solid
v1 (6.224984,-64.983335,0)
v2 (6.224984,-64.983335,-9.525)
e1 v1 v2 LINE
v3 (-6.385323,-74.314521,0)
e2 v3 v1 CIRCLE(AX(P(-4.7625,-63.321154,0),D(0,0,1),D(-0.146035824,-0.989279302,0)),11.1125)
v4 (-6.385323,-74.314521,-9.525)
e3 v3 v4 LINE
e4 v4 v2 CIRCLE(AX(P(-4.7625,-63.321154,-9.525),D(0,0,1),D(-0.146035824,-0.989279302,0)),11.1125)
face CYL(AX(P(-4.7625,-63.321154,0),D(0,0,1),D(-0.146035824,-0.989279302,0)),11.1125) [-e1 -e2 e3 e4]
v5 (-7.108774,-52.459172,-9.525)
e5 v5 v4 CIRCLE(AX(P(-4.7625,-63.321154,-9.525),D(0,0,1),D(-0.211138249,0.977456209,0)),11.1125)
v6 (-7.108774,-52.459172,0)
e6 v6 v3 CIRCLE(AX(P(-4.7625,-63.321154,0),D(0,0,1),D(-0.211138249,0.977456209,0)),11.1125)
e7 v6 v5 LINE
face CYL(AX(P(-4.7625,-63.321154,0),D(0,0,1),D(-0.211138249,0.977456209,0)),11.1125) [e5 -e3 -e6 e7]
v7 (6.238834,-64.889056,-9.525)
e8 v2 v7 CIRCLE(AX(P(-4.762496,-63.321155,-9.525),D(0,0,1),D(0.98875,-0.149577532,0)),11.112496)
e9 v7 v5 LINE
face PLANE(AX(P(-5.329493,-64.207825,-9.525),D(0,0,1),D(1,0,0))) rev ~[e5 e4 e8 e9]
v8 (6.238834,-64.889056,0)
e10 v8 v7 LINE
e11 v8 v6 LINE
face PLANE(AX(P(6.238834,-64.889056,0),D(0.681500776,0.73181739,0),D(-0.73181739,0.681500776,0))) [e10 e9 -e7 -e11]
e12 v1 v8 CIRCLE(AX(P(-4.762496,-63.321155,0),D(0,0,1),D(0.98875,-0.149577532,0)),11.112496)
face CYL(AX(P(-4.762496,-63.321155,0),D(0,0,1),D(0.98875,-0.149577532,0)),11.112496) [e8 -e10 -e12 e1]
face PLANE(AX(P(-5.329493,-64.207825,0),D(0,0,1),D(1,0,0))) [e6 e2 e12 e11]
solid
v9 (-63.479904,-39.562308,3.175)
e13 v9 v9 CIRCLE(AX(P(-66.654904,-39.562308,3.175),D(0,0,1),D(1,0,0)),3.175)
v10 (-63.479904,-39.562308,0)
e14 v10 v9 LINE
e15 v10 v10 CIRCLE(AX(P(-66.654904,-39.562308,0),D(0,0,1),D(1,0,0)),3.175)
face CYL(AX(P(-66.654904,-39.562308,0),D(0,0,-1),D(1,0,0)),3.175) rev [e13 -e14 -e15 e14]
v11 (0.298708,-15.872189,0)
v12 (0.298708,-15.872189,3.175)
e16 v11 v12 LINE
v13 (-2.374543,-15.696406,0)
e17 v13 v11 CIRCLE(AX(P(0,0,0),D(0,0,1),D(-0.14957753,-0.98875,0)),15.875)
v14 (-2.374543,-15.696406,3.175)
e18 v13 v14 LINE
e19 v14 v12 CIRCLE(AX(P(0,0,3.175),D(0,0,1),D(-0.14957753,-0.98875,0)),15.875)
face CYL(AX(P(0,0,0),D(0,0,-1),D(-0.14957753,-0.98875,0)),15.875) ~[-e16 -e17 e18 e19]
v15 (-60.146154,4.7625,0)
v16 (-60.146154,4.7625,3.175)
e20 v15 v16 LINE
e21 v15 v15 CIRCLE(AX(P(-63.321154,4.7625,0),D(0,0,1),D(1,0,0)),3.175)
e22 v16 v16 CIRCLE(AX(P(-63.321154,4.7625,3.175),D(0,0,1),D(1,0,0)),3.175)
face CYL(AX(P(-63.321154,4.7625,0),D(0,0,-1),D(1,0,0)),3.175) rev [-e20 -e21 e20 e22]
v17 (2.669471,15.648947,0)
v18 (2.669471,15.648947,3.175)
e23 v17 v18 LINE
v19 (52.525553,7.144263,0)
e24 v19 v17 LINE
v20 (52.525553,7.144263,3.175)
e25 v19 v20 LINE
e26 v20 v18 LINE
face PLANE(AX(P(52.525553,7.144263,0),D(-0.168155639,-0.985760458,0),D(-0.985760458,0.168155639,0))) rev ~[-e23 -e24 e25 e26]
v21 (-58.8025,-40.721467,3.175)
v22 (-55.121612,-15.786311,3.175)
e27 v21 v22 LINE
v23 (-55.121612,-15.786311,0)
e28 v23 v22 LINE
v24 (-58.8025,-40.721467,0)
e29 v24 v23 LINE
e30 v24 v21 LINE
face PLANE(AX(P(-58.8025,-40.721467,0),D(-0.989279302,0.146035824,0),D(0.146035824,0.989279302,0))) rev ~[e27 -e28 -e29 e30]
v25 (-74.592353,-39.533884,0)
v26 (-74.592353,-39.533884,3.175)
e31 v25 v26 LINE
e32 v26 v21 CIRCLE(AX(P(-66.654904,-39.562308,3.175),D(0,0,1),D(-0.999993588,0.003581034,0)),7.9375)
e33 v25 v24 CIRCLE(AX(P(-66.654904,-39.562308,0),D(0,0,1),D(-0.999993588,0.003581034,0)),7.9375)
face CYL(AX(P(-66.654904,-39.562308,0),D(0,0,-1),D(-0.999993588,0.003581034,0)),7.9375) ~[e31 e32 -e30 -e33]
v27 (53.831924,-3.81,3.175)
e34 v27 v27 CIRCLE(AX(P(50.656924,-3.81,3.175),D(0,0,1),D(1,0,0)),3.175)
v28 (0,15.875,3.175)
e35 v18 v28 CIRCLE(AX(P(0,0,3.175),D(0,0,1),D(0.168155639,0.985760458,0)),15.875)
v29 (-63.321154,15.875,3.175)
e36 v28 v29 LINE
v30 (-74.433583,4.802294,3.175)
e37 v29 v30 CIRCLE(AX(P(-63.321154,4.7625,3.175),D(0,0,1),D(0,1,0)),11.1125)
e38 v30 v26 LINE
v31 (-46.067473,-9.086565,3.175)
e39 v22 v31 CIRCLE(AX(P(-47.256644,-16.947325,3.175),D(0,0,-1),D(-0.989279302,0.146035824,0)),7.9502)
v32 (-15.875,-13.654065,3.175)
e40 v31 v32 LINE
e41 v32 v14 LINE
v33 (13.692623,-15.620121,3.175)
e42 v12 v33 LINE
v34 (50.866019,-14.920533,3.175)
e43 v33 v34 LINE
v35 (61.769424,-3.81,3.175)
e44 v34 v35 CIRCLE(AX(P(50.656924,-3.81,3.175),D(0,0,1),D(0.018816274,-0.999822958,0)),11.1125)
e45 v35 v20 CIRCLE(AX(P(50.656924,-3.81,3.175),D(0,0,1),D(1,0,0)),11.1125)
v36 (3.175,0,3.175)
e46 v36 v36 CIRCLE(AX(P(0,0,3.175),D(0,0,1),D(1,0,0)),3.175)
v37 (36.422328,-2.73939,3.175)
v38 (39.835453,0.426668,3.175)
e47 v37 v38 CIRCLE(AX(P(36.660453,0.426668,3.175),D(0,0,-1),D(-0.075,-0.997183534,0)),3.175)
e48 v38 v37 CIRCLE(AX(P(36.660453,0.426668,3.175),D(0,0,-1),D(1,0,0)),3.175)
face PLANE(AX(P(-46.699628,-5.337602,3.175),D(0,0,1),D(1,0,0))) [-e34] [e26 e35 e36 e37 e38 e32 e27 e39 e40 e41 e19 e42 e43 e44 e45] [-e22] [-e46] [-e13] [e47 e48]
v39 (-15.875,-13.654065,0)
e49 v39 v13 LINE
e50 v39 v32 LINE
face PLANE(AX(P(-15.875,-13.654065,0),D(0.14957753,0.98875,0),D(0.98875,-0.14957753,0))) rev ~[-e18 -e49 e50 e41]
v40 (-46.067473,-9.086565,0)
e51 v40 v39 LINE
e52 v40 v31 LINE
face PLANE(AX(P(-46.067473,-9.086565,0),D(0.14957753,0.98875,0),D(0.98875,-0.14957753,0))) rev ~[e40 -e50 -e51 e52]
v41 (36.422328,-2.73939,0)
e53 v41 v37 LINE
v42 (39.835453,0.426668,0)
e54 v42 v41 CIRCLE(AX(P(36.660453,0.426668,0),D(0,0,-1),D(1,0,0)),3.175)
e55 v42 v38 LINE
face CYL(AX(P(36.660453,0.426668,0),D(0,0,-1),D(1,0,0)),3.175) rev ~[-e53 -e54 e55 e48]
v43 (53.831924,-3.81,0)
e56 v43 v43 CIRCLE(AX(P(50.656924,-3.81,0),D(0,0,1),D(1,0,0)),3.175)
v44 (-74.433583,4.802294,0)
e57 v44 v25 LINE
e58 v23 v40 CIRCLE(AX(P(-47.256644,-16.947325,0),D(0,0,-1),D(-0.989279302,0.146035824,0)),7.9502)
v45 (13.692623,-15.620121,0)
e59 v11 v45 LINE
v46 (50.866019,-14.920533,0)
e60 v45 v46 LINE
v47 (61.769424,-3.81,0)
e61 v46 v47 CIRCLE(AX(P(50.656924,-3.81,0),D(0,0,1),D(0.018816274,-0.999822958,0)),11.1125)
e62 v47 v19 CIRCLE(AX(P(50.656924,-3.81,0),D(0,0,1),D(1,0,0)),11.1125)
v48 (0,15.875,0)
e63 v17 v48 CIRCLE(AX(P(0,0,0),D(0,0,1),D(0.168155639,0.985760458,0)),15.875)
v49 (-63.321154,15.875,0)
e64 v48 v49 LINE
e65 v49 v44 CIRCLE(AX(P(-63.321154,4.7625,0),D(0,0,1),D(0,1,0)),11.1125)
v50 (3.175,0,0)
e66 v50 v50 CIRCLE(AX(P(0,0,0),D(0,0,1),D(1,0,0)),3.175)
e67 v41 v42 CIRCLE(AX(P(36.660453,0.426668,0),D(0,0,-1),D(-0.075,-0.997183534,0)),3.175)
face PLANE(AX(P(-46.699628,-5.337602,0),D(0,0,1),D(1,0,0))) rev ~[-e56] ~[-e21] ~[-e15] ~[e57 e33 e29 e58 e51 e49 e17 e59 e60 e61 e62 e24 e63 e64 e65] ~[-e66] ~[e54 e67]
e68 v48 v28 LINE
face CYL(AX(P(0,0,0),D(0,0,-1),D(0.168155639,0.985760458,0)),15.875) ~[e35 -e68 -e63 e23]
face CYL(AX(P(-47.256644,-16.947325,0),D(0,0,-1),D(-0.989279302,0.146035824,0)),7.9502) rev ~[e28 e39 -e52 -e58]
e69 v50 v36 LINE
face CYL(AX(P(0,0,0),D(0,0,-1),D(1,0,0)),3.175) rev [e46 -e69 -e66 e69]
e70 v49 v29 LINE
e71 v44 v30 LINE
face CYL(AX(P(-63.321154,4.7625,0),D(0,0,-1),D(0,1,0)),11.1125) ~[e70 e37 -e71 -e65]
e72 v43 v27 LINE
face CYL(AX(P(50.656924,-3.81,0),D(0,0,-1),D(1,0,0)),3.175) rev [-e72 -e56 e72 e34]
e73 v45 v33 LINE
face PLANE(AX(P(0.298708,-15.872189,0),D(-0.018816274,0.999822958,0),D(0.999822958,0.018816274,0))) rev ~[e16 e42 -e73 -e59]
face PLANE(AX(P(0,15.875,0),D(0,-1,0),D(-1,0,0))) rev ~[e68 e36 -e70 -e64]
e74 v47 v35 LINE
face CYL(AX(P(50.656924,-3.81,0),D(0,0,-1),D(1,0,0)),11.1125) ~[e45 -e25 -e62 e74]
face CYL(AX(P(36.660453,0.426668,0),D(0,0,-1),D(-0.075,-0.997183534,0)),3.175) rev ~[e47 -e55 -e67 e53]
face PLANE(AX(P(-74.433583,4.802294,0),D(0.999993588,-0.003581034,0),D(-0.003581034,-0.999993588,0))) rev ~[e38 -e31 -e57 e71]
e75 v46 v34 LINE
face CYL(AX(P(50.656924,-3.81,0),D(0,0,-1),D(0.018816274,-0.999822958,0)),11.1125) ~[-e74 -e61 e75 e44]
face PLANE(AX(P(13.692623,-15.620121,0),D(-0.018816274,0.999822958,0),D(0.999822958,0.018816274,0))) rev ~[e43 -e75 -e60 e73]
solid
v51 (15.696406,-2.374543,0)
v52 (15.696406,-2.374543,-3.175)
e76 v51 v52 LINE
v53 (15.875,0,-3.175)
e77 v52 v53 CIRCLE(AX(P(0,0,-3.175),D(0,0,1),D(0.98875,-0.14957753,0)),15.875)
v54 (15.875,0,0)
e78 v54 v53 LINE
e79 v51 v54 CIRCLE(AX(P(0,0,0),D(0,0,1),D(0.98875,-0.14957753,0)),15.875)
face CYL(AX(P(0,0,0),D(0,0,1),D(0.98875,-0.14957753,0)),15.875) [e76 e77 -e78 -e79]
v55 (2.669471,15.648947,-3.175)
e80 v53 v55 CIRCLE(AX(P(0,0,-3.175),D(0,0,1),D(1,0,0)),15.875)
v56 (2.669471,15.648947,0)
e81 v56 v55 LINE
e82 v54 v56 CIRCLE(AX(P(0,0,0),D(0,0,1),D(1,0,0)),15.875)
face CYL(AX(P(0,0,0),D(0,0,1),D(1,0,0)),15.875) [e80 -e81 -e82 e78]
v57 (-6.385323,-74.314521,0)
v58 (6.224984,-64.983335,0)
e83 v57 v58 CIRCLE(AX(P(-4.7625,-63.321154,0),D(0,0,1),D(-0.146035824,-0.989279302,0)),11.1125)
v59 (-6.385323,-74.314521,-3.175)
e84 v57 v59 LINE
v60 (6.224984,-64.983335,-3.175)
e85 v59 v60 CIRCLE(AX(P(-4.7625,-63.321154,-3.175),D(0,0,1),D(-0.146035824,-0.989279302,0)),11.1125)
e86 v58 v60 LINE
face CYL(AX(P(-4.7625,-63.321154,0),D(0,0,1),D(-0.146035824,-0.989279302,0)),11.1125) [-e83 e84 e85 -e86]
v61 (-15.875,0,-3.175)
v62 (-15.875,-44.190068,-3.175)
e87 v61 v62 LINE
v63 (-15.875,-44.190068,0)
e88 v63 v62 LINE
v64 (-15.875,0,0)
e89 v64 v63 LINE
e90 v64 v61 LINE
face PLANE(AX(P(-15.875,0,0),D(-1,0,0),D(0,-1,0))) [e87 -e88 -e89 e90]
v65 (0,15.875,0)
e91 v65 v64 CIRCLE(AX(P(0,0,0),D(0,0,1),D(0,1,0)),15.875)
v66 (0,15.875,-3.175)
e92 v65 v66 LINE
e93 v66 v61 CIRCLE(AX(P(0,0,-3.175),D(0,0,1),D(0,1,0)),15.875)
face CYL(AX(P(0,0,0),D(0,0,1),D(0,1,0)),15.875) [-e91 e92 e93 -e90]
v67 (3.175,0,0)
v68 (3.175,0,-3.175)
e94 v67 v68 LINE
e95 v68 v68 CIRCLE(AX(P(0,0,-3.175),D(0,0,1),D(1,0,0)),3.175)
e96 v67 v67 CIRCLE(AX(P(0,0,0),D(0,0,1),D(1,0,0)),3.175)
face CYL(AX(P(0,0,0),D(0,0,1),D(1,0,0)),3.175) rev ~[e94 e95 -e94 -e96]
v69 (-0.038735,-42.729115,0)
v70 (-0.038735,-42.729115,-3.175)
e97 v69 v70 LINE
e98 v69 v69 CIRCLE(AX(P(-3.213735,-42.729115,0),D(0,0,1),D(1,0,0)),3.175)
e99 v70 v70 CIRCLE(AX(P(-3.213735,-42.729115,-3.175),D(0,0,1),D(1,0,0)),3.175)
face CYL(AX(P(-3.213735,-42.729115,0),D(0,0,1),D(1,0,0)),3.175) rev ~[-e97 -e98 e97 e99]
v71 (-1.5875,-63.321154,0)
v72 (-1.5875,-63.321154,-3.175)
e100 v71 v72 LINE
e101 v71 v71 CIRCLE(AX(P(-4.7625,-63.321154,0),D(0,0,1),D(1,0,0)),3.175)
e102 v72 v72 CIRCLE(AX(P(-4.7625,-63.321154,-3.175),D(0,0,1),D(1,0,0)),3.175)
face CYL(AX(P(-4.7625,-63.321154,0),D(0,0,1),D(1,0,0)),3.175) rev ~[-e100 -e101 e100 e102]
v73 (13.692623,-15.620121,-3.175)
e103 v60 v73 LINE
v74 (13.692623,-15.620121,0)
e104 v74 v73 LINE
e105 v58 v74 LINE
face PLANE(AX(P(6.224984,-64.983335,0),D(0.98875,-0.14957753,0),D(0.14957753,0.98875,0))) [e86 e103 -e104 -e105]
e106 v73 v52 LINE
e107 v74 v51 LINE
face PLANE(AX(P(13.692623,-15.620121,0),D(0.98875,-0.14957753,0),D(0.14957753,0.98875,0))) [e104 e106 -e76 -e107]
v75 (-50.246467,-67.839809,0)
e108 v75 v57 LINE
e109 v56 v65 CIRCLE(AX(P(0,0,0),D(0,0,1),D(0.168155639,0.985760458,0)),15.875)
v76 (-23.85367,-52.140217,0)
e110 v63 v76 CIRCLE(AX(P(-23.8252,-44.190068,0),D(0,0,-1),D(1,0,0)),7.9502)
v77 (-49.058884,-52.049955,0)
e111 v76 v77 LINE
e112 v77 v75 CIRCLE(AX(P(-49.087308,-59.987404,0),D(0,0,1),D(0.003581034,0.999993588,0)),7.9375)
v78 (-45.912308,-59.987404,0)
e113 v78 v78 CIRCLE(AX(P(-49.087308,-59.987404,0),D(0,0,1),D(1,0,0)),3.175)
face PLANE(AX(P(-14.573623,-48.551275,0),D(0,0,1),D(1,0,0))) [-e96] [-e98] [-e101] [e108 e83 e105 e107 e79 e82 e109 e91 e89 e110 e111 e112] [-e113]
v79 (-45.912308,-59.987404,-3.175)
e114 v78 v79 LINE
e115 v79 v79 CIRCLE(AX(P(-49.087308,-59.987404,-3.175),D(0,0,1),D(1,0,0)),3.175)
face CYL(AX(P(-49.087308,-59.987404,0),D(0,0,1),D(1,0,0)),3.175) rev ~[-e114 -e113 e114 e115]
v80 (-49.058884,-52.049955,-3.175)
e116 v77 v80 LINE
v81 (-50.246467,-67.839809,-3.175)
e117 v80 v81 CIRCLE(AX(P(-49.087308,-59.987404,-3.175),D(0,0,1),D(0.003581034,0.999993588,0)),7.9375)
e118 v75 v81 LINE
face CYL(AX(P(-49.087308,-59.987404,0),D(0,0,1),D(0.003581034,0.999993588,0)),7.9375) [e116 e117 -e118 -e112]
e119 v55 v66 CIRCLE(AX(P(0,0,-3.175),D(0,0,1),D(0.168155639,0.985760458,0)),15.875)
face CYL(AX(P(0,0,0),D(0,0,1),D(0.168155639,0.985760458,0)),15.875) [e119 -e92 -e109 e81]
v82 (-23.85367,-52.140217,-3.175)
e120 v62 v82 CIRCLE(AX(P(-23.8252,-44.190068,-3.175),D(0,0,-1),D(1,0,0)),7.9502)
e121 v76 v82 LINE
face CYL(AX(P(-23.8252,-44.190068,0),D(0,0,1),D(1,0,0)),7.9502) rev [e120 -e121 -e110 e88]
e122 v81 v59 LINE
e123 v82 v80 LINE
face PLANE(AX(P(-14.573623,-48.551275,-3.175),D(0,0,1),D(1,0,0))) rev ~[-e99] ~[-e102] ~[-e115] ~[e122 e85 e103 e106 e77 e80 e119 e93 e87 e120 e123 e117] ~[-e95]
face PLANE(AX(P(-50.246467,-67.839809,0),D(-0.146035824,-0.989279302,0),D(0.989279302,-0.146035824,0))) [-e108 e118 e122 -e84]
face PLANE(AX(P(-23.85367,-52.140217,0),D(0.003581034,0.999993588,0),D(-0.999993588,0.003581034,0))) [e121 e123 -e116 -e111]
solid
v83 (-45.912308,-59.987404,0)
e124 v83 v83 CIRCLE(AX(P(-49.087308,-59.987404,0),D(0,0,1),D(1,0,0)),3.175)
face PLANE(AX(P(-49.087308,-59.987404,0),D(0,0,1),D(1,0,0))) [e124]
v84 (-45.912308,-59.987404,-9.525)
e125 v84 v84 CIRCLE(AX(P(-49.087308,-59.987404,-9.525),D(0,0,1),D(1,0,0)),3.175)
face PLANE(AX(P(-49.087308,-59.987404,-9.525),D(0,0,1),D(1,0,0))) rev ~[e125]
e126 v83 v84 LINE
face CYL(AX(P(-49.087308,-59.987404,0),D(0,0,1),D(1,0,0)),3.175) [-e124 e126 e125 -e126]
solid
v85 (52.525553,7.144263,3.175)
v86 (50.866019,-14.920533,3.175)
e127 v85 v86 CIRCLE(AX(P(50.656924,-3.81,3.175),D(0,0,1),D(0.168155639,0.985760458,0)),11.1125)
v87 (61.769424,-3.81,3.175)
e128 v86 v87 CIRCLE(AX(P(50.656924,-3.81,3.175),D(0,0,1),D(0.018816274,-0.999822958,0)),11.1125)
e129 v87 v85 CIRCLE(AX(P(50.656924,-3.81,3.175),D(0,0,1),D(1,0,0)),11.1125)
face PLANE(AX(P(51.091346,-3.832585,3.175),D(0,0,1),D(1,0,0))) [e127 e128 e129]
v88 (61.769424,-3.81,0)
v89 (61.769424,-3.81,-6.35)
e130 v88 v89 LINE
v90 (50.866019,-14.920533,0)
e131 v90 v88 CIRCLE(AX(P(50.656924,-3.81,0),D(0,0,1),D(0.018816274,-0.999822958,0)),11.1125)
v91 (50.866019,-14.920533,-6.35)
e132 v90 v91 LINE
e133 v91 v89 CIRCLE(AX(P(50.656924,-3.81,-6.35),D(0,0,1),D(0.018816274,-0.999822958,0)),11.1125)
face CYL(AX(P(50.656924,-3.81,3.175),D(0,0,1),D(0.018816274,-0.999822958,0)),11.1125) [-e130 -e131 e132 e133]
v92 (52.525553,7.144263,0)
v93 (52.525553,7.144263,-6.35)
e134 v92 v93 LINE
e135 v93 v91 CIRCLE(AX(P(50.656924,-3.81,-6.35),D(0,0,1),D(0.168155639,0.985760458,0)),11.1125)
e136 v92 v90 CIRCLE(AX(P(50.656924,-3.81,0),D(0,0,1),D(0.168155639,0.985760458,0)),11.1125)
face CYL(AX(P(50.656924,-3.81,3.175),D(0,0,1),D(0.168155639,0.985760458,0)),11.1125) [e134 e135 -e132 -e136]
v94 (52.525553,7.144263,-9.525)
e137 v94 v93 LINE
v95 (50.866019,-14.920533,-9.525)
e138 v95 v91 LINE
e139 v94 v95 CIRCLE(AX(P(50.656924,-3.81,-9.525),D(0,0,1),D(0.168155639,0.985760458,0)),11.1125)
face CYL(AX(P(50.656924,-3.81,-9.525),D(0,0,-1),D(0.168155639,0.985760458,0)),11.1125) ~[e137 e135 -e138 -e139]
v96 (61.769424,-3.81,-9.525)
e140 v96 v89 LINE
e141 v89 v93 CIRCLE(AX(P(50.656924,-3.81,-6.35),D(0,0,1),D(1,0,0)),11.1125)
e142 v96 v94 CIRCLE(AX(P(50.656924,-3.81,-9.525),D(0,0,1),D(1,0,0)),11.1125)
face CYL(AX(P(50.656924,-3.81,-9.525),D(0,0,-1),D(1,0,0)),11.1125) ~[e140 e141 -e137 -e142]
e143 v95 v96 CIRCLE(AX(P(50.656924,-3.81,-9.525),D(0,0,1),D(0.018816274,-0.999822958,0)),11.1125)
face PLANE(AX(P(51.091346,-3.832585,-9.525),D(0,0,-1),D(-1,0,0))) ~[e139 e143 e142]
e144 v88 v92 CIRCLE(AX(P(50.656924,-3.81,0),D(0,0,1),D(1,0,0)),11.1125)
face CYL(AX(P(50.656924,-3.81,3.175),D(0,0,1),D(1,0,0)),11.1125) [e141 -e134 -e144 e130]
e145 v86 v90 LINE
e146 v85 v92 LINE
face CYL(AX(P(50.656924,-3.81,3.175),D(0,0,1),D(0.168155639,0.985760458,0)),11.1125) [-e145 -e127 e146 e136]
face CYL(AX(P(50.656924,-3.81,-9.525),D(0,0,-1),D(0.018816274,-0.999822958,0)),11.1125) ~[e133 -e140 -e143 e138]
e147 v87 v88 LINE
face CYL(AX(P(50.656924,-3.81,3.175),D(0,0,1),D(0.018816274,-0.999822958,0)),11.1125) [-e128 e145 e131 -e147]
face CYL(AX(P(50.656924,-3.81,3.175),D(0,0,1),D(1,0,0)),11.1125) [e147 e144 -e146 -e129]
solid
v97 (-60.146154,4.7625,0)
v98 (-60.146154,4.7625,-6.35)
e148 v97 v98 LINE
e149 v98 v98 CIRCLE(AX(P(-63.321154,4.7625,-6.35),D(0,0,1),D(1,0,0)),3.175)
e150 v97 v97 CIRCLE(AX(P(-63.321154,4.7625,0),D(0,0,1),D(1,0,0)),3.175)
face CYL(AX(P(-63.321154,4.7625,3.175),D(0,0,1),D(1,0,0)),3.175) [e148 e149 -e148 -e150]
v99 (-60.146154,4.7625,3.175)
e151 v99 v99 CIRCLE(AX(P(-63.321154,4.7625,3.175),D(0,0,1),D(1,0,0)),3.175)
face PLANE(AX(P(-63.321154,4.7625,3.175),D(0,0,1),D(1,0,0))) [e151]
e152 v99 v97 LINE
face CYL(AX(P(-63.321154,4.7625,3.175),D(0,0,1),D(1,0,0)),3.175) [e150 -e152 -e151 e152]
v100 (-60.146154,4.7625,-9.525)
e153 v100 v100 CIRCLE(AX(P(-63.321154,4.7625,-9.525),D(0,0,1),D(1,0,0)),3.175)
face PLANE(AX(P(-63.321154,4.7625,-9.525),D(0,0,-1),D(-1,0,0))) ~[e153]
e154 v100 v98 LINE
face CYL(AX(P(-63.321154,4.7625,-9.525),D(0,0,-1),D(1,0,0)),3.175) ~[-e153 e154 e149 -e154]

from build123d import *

# Parameters (mm, degrees)
F0_R     = 3.175
F1_DEPTH = 3.175
F2_DEPTH = 3.175
F4_R     = 3.175
F6_DEPTH = 9.525
F3_R     = 3.175


# Not quite as in the source:
# - a pattern or mirror of a feature is missing from the dataset's text; its kind, count and spacing are read off the source's solid


with BuildPart() as f1:
    # F0 (on Top) → F1 (new body)
    with BuildSketch(Plane.XY):
        with BuildLine():
            ThreePointArc((-15.875, 0), (-11.2253201513, 11.2253201513), (0, 15.875))
            Line((0, 15.875), (-63.3211543937, 15.875))
            ThreePointArc((-63.3211543937, 15.875), (-55.4634302878, 12.6202241059), (-52.2086543937, 4.7625))
            ThreePointArc((-52.2086543937, 4.7625), (-63.3410515432, -6.3499821869), (-74.4335831412, 4.8022942352))
            Line((-74.4335831412, 4.8022942352), (-74.5923534991, -39.5338836219))
            ThreePointArc((-74.5923534991, -39.5338836219), (-66.6406921441, -31.6248207993), (-58.7174043937, -39.5623080756))
            ThreePointArc((-58.7174043937, -39.5623080756), (-58.7387068636, -40.1434474), (-58.8024999312, -40.7214674292))
            Line((-58.8024999312, -40.7214674292), (-55.1216121776, -15.7863113327))
            ThreePointArc((-55.1216121776, -15.7863113327), (-51.9856201231, -10.5565144679), (-46.0674725884, -9.0865650912))
            Line((-46.0674725884, -9.0865650912), (-15.875, -13.6540649408))
            Line((-15.875, -13.6540649408), (-15.875, 0))
        make_face()
        with BuildLine():
            ThreePointArc((-52.2086543937, 4.7625), (-55.4634302878, 12.6202241059), (-63.3211543937, 15.875))
            ThreePointArc((-63.3211543937, 15.875), (-71.1647964945, 12.6342809195), (-74.4335831412, 4.8022942352))
            ThreePointArc((-74.4335831412, 4.8022942352), (-63.3410515432, -6.3499821869), (-52.2086543937, 4.7625))
        make_face()
        with Locations((-63.3211543937, 4.7625)):
            Circle(F0_R, mode=Mode.SUBTRACT)
        with BuildLine():
            ThreePointArc((15.69640625, -2.3745432898), (15.8302885984, -1.190625), (15.875, 0))
            ThreePointArc((15.875, 0), (12.1324662265, 10.238109604), (2.6694707699, 15.6489472748))
            ThreePointArc((2.6694707699, 15.6489472748), (1.3395124137, 15.8183858688), (0, 15.875))
            ThreePointArc((0, 15.875), (-11.2253201513, 11.2253201513), (-15.875, 0))
            ThreePointArc((-15.875, 0), (-12.0356034274, -10.3518054047), (-2.3745432898, -15.69640625))
            ThreePointArc((-2.3745432898, -15.69640625), (-1.0416321888, -15.8407899861), (0.2987083423, -15.8721894623))
            ThreePointArc((0.2987083423, -15.8721894623), (10.4645848343, -11.9376752027), (15.69640625, -2.3745432898))
        make_face()
        Circle(F0_R, mode=Mode.SUBTRACT)
        with BuildLine():
            ThreePointArc((61.769423515, -3.81), (59.1496498735, 3.3566767228), (52.5255530539, 7.1442630923))
            ThreePointArc((52.5255530539, 7.1442630923), (39.5757214961, -2.9765625), (50.8660193546, -14.9205326236))
            ThreePointArc((50.8660193546, -14.9205326236), (58.5882296422, -11.5934464966), (61.769423515, -3.81))
        make_face()
        with Locations((50.656923515, -3.81)):
            Circle(F0_R, mode=Mode.SUBTRACT)
        with BuildLine():
            ThreePointArc((2.6694707699, 15.6489472748), (12.1324662265, 10.238109604), (15.875, 0))
            ThreePointArc((15.875, 0), (15.8302885984, -1.190625), (15.69640625, -2.3745432898))
            Line((15.69640625, -2.3745432898), (13.6926228472, -15.6201212767))
            Line((13.6926228472, -15.6201212767), (50.8660193546, -14.9205326236))
            ThreePointArc((50.8660193546, -14.9205326236), (39.5757214961, -2.9765625), (52.5255530539, 7.1442630923))
            Line((52.5255530539, 7.1442630923), (2.6694707699, 15.6489472748))
        make_face()
        with BuildLine():
            ThreePointArc((36.4223280073, -2.73939), (34.501219564, 2.7543996496), (39.8354530073, 0.4266677197))
            ThreePointArc((39.8354530073, 0.4266677197), (38.8196864505, -1.9010642102), (36.4223280073, -2.73939))
        make_face(mode=Mode.SUBTRACT)
        with BuildLine():
            Line((13.6926228472, -15.6201212767), (15.69640625, -2.3745432898))
            ThreePointArc((15.69640625, -2.3745432898), (10.4645848343, -11.9376752027), (0.2987083423, -15.8721894623))
            Line((0.2987083423, -15.8721894623), (13.6926228472, -15.6201212767))
        make_face()
        with BuildLine():
            ThreePointArc((-2.3745432898, -15.69640625), (-12.0356034274, -10.3518054047), (-15.875, 0))
            Line((-15.875, 0), (-15.875, -13.6540649408))
            Line((-15.875, -13.6540649408), (-2.3745432898, -15.69640625))
        make_face()
        with BuildLine():
            ThreePointArc((-58.7174043937, -39.5623080756), (-66.6406921441, -31.6248207993), (-74.5923534991, -39.5338836219))
            ThreePointArc((-74.5923534991, -39.5338836219), (-67.2502168937, -47.4774523748), (-58.8024999312, -40.7214674292))
            ThreePointArc((-58.8024999312, -40.7214674292), (-58.7387068636, -40.1434474), (-58.7174043937, -39.5623080756))
        make_face()
        with Locations((-66.6549043937, -39.5623080756)):
            Circle(F0_R, mode=Mode.SUBTRACT)
    extrude(amount=F1_DEPTH)


with BuildPart() as f2:
    # F0 (on Top) → F2 (new body)
    with BuildSketch(Plane.XY):
        with BuildLine():
            Line((13.6926228472, -15.6201212767), (0.2987083423, -15.8721894623))
            ThreePointArc((0.2987083423, -15.8721894623), (-1.0416321888, -15.8407899861), (-2.3745432898, -15.69640625))
            Line((-2.3745432898, -15.69640625), (-15.875, -13.6540649408))
            Line((-15.875, -13.6540649408), (-15.875, -44.1900675587))
            ThreePointArc((-15.875, -44.1900675587), (-18.213634337, -49.8217645365), (-23.8536699328, -52.1402165826))
            Line((-23.8536699328, -52.1402165826), (-49.0588836219, -52.0499552883))
            ThreePointArc((-49.0588836219, -52.0499552883), (-43.4646074188, -54.3848028931), (-41.1498080756, -59.9874043937))
            ThreePointArc((-41.1498080756, -59.9874043937), (-43.9006386779, -65.9959289055), (-50.2464674292, -67.8398088562))
            Line((-50.2464674292, -67.8398088562), (-6.385323095, -74.3145206412))
            ThreePointArc((-6.385323095, -74.3145206412), (-12.0238371567, -54.9092200771), (6.35, -63.3211543937))
            ThreePointArc((6.35, -63.3211543937), (6.3187020189, -64.1545918937), (6.224984375, -64.9833346965))
            Line((6.224984375, -64.9833346965), (13.6926228472, -15.6201212767))
        make_face()
        with Locations((-3.213735, -42.7291149849)):
            Circle(F0_R, mode=Mode.SUBTRACT)
        with BuildLine():
            ThreePointArc((-49.0588836219, -52.0499552883), (-57.0024523748, -59.3920918937), (-50.2464674292, -67.8398088562))
            ThreePointArc((-50.2464674292, -67.8398088562), (-43.9006386779, -65.9959289055), (-41.1498080756, -59.9874043937))
            ThreePointArc((-41.1498080756, -59.9874043937), (-43.4646074188, -54.3848028931), (-49.0588836219, -52.0499552883))
        make_face()
        with Locations((-49.0873080756, -59.9874043937)):
            Circle(F0_R, mode=Mode.SUBTRACT)
        with BuildLine():
            ThreePointArc((-6.385323095, -74.3145206412), (1.847490772, -72.253997068), (6.224984375, -64.9833346965))
            ThreePointArc((6.224984375, -64.9833346965), (6.3187020189, -64.1545918937), (6.35, -63.3211543937))
            ThreePointArc((6.35, -63.3211543937), (-12.0238371567, -54.9092200771), (-6.385323095, -74.3145206412))
        make_face()
        with Locations((-4.7625, -63.3211543937)):
            Circle(F0_R, mode=Mode.SUBTRACT)
        with BuildLine():
            ThreePointArc((15.69640625, -2.3745432898), (15.8302885984, -1.190625), (15.875, 0))
            ThreePointArc((15.875, 0), (12.1324662265, 10.238109604), (2.6694707699, 15.6489472748))
            ThreePointArc((2.6694707699, 15.6489472748), (1.3395124137, 15.8183858688), (0, 15.875))
            ThreePointArc((0, 15.875), (-11.2253201513, 11.2253201513), (-15.875, 0))
            ThreePointArc((-15.875, 0), (-12.0356034274, -10.3518054047), (-2.3745432898, -15.69640625))
            ThreePointArc((-2.3745432898, -15.69640625), (-1.0416321888, -15.8407899861), (0.2987083423, -15.8721894623))
            ThreePointArc((0.2987083423, -15.8721894623), (10.4645848343, -11.9376752027), (15.69640625, -2.3745432898))
        make_face()
        Circle(F0_R, mode=Mode.SUBTRACT)
        with BuildLine():
            Line((13.6926228472, -15.6201212767), (15.69640625, -2.3745432898))
            ThreePointArc((15.69640625, -2.3745432898), (10.4645848343, -11.9376752027), (0.2987083423, -15.8721894623))
            Line((0.2987083423, -15.8721894623), (13.6926228472, -15.6201212767))
        make_face()
        with BuildLine():
            ThreePointArc((-2.3745432898, -15.69640625), (-12.0356034274, -10.3518054047), (-15.875, 0))
            Line((-15.875, 0), (-15.875, -13.6540649408))
            Line((-15.875, -13.6540649408), (-2.3745432898, -15.69640625))
        make_face()
    extrude(amount=-F2_DEPTH)


with BuildPart() as f6:
    # F4 (on face) → F6 (new body, through all)
    with BuildSketch(Plane.XY):
        with Locations((-49.0873080756, -59.9874043937)):
            Circle(F4_R)
    extrude(amount=-F6_DEPTH)


with BuildPart() as f6b:
    # F4 (on face) → F6, piece 2 (new body, through all)
    with BuildSketch(Plane.XY):
        with BuildLine():
            ThreePointArc((-7.1087737889, -52.4591722745), (-15.8689168649, -63.6887964396), (-6.385323095, -74.3145206412))
            ThreePointArc((-6.385323095, -74.3145206412), (1.847490772, -72.253997068), (6.224984375, -64.9833346965))
            ThreePointArc((6.224984375, -64.9833346965), (6.232010065, -64.9362100216), (6.2388336409, -64.8890556569))
            Line((6.2388336409, -64.8890556569), (-7.1087737889, -52.4591722745))
        make_face()
        with Locations((-4.7625, -63.3211543937)):
            Circle(F4_R, mode=Mode.SUBTRACT)
        with Locations((-4.7625, -63.3211543937)):
            Circle(F4_R)
    extrude(amount=-F6_DEPTH)


with BuildPart() as f6c:
    # F3 (on face) → F6, piece 3 (new body, through all)
    with BuildSketch(Plane.XY.offset(3.175)):
        with Locations((-63.3211543937, 4.7625)):
            Circle(F3_R)
    extrude(amount=-F6_DEPTH)

    # F6_3_copies: F6c across plane


with BuildPart() as f6d:
    # F3 (on face) → F6, piece 4 (new body, through all)
    with BuildSketch(Plane.XY.offset(3.175)):
        with BuildLine():
            ThreePointArc((50.8660193546, -14.9205326236), (58.5882296422, -11.5934464966), (61.769423515, -3.81))
            ThreePointArc((61.769423515, -3.81), (59.1496498735, 3.3566767228), (52.5255530539, 7.1442630923))
            ThreePointArc((52.5255530539, 7.1442630923), (39.5757214961, -2.9765625), (50.8660193546, -14.9205326236))
        make_face()
        with Locations((50.656923515, -3.81)):
            Circle(F3_R, mode=Mode.SUBTRACT)
        with Locations((50.656923515, -3.81)):
            Circle(F3_R)
    extrude(amount=-F6_DEPTH)

    # F6_4_copies: F6d across plane


with BuildPart() as f6c_1:
    add(f6c.part)
    add(f6c.part.mirror(Plane(origin=(0, 0, -3.175), x_dir=(-1, 0, 0), z_dir=(0, 0, -1))))


with BuildPart() as f6d_1:
    add(f6d.part)
    add(f6d.part.mirror(Plane(origin=(0, 0, -3.175), x_dir=(-1, 0, 0), z_dir=(0, 0, -1))))


solid = Compound([f1.part, f2.part, f6.part, f6b.part, f6c_1.part, f6d_1.part])
